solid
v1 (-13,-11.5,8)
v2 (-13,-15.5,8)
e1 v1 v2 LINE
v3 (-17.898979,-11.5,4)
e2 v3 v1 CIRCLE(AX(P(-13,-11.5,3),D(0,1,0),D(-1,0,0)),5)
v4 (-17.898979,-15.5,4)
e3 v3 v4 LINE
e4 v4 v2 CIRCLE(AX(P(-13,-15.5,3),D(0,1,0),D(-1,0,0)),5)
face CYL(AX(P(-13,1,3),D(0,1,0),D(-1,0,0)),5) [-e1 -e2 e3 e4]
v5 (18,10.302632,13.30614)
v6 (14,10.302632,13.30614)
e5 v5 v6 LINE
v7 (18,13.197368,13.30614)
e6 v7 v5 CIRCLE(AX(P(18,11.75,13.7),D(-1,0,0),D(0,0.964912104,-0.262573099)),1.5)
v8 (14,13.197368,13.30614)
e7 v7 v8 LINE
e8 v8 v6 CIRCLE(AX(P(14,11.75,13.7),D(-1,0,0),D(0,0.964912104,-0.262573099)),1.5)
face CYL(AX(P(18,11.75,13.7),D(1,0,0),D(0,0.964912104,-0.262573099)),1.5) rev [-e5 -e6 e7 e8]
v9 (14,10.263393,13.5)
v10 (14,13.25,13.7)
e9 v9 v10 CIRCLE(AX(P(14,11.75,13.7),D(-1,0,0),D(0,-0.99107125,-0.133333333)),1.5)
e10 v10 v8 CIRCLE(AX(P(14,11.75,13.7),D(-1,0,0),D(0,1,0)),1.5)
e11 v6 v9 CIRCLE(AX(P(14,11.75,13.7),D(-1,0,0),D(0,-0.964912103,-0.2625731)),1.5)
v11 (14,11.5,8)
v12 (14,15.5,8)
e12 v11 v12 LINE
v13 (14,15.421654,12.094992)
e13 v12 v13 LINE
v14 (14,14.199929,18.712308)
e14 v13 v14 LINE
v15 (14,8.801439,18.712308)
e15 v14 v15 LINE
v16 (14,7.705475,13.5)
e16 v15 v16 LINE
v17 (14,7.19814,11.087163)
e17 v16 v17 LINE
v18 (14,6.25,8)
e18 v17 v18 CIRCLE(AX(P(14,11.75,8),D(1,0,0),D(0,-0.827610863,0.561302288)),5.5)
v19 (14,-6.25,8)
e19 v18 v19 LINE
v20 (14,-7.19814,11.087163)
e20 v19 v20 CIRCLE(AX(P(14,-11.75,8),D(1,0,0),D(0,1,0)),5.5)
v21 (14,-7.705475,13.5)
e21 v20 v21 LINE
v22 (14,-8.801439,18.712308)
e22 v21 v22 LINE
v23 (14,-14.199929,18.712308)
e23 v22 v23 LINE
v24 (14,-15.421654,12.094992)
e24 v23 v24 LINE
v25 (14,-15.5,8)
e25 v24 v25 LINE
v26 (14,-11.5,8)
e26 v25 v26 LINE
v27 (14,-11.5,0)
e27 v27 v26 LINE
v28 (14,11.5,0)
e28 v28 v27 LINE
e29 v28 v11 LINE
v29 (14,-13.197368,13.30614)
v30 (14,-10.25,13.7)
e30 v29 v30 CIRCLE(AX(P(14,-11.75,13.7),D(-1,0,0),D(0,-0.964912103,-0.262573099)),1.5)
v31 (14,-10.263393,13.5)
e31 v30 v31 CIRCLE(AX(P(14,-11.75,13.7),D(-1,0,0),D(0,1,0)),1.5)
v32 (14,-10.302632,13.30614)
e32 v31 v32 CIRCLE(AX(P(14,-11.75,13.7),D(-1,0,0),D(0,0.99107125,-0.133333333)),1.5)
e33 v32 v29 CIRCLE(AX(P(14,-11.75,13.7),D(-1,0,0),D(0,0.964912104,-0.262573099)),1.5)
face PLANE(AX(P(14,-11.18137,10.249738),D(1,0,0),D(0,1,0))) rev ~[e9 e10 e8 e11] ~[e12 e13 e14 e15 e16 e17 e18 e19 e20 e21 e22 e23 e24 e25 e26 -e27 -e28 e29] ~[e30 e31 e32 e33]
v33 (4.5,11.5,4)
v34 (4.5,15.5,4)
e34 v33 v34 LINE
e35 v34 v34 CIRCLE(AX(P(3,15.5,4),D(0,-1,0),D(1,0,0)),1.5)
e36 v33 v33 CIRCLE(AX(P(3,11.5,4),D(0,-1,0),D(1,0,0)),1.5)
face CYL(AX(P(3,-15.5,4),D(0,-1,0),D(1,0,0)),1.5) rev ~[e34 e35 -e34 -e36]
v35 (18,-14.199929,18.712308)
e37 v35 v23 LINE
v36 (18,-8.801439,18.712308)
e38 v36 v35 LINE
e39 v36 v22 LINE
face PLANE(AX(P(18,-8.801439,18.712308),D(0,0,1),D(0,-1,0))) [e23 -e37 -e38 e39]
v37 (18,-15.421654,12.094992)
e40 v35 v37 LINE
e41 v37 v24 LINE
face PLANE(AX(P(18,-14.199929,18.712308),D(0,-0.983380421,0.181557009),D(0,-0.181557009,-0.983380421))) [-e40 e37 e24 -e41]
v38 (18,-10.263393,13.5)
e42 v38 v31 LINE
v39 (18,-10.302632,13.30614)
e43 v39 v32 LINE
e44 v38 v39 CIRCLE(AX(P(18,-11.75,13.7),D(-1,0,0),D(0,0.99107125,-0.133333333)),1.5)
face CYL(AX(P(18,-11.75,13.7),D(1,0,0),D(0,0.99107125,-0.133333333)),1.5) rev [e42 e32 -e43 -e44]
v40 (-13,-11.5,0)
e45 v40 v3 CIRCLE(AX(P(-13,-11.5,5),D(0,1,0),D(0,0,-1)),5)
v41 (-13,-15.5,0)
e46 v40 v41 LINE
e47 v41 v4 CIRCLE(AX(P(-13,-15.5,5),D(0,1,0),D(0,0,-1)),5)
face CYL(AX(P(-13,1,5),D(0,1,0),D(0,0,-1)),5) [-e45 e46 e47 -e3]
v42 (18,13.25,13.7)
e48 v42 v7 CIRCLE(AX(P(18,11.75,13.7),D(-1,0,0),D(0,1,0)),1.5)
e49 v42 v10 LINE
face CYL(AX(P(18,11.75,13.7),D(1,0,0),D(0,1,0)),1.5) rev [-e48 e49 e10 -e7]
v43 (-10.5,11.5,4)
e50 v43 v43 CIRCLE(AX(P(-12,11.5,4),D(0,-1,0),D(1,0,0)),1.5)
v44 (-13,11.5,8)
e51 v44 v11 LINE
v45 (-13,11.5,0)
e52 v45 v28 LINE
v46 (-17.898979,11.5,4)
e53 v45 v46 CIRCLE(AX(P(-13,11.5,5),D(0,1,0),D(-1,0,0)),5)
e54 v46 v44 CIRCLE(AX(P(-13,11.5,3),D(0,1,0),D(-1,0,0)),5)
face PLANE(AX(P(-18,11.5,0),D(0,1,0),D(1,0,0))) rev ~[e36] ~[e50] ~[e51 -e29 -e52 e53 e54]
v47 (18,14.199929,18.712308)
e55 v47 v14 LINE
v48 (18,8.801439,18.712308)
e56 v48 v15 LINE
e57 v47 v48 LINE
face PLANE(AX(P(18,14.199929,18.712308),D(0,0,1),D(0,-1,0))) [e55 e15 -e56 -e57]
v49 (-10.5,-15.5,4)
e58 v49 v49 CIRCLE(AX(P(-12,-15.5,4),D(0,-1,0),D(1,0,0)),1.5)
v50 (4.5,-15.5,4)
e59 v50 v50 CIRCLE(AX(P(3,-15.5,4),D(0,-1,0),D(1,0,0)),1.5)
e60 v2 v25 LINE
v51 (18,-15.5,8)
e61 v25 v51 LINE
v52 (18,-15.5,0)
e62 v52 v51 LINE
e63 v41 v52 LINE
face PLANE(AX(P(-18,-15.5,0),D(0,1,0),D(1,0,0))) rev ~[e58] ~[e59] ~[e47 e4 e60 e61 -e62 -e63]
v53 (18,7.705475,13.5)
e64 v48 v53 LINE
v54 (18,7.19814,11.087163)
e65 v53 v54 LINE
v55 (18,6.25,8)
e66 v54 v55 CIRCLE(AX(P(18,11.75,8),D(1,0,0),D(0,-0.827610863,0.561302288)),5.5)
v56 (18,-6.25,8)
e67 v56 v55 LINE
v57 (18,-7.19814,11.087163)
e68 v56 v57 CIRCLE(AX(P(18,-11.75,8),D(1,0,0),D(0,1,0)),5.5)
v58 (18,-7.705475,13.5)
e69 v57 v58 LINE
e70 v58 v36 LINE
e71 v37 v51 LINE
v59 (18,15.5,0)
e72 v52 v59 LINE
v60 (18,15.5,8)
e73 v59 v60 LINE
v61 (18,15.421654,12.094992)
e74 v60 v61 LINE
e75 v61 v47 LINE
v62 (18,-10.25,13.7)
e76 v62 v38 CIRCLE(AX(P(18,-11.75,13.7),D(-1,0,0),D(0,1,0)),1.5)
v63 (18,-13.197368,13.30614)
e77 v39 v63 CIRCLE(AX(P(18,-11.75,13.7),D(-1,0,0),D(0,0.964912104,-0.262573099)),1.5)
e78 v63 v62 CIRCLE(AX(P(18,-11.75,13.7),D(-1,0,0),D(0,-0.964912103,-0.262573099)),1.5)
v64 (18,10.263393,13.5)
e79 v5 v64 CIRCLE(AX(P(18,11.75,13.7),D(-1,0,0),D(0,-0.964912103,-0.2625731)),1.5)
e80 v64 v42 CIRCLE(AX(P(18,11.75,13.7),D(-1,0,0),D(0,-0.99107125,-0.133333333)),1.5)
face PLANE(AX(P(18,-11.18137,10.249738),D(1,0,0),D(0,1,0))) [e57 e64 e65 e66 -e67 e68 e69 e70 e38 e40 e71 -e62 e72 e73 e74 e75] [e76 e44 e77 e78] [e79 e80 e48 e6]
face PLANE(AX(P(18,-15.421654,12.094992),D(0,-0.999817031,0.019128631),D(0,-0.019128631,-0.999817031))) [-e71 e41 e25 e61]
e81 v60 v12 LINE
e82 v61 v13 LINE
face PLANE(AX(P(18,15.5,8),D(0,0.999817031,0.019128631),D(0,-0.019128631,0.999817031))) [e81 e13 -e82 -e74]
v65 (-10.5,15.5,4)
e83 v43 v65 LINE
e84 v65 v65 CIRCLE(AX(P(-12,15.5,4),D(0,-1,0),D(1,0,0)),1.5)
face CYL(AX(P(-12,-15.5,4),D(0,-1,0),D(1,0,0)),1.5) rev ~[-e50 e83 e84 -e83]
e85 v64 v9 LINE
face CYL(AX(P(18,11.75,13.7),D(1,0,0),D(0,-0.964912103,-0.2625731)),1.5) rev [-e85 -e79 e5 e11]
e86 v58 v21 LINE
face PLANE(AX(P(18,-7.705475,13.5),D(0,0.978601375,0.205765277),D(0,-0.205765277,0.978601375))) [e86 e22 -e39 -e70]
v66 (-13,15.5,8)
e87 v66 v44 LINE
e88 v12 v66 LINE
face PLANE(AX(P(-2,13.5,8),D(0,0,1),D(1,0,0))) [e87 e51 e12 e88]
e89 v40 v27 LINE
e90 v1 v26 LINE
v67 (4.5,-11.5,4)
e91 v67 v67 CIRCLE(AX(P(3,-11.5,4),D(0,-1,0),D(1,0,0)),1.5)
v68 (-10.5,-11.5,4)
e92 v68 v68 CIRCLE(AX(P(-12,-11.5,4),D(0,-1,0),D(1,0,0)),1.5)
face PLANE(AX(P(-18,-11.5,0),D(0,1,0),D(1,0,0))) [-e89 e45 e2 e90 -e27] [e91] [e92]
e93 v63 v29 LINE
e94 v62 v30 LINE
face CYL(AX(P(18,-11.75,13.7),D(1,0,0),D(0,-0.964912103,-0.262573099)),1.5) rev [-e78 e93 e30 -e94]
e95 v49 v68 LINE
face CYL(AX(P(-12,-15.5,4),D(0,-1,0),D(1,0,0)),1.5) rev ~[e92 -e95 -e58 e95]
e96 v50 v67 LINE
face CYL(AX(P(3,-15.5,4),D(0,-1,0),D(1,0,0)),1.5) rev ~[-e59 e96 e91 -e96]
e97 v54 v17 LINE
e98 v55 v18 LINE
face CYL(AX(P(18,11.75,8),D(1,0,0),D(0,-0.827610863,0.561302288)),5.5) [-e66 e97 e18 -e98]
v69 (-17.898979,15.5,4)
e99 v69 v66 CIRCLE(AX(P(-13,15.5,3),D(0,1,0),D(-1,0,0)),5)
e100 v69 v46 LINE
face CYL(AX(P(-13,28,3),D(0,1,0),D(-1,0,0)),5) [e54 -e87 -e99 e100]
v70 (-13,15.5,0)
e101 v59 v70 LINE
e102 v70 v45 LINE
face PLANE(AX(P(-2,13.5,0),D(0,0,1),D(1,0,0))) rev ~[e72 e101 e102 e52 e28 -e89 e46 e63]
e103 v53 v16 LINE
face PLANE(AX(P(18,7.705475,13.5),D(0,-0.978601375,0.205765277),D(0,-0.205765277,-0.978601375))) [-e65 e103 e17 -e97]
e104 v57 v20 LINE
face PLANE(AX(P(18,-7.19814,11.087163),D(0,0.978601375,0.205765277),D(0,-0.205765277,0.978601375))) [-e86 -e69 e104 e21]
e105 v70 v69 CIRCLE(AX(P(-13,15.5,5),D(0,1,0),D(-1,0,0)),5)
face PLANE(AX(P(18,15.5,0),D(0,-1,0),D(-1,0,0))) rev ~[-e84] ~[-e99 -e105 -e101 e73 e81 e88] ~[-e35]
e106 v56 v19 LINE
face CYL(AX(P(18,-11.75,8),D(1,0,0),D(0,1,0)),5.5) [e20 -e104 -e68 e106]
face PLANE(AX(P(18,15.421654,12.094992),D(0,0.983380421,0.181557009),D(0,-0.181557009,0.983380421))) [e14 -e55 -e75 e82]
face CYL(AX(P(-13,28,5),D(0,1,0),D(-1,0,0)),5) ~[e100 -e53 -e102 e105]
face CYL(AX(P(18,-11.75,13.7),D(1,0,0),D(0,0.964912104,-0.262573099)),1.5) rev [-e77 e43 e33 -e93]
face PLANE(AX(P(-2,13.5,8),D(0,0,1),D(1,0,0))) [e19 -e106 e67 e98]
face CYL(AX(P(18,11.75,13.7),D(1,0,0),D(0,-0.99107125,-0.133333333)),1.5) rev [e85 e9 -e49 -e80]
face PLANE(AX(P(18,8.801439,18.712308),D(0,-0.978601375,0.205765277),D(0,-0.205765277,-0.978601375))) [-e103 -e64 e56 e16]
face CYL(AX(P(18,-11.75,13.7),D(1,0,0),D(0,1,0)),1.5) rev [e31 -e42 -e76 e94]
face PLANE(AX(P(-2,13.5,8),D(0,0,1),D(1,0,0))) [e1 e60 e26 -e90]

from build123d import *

# Parameters (mm, degrees)
F0_W        = 32
F0_H        = 4
F1_DEPTH    = 8
F3_DEPTH    = 4
F4_DEPTH    = 25
F5_R        = 1.5
F6_DEPTH    = 40
F7_T1_DEPTH = 29
F7_T3_DEPTH = 29


# Not quite as in the source:
# - a fillet or chamfer that OpenCascade refuses, or shapes differently, is made with other operations: its cross-section is extruded or revolved along the edge and cut away or added


with BuildPart() as f1:
    # F0 (on Top) → F1 (new body)
    with BuildSketch(Plane.XY):
        with Locations((-2, 13.5)):
            Rectangle(F0_W, F0_H)
        Polygon((14, 11.5), (14, -11.5), (14, -15.5), (18, -15.5), (18, 0), (18, 15.5), (14, 15.5), align=None)
        with Locations((-2, -13.5)):
            Rectangle(F0_W, F0_H)
    extrude(amount=F1_DEPTH)

    # F2 (on face) → F3 (join, through all)
    with BuildSketch(Plane.YZ.offset(18)):
        with BuildLine():
            Line((-15.4216540828, 12.0949916113), (-15.5, 8))
            Line((-15.5, 8), (-6.25, 8))
            ThreePointArc((-6.25, 8), (-6.4923756022, 9.6147401314), (-7.1981402517, 11.0871625858))
            ThreePointArc((-7.1981402517, 11.0871625858), (-8.5517740167, 12.4745223834), (-10.3026318448, 13.3061403509))
            ThreePointArc((-10.3026318448, 13.3061403509), (-11.75, 12.2), (-13.1973681552, 13.3061403509))
            ThreePointArc((-13.1973681552, 13.3061403509), (-14.3801744212, 12.8303397928), (-15.4216540828, 12.0949916113))
        make_face()
        with BuildLine():
            Line((6.25, 8), (11.75, 8))
            Line((11.75, 8), (15.5, 8))
            Line((15.5, 8), (15.4216540828, 12.0949916113))
            ThreePointArc((15.4216540828, 12.0949916113), (14.3801744212, 12.8303397928), (13.1973681552, 13.3061403509))
            ThreePointArc((13.1973681552, 13.3061403509), (11.75, 12.2), (10.3026318448, 13.3061403509))
            ThreePointArc((10.3026318448, 13.3061403509), (8.5517740167, 12.4745223834), (7.1981402517, 11.0871625858))
            ThreePointArc((7.1981402517, 11.0871625858), (6.4923756022, 9.6147401314), (6.25, 8))
        make_face()
        with BuildLine():
            Line((-14.1999293119, 18.7123082578), (-15.4216540828, 12.0949916113))
            ThreePointArc((-15.4216540828, 12.0949916113), (-14.3801744212, 12.8303397928), (-13.1973681552, 13.3061403509))
            ThreePointArc((-13.1973681552, 13.3061403509), (-11.9486803553, 15.1867838163), (-10.25, 13.7))
            ThreePointArc((-10.25, 13.7), (-10.2533520267, 13.5997760311), (-10.2633931253, 13.5))
            Line((-10.2633931253, 13.5), (-7.7054746686, 13.5))
            Line((-7.7054746686, 13.5), (-8.8014388457, 18.7123082578))
            Line((-8.8014388457, 18.7123082578), (-14.1999293119, 18.7123082578))
        make_face()
        with BuildLine():
            ThreePointArc((-10.3026318448, 13.3061403509), (-8.5517740167, 12.4745223834), (-7.1981402517, 11.0871625858))
            Line((-7.1981402517, 11.0871625858), (-7.7054746686, 13.5))
            Line((-7.7054746686, 13.5), (-10.2633931253, 13.5))
            ThreePointArc((-10.2633931253, 13.5), (-10.2798136989, 13.4024227159), (-10.3026318448, 13.3061403509))
        make_face()
        with BuildLine():
            ThreePointArc((13.1973681552, 13.3061403509), (14.3801744212, 12.8303397928), (15.4216540828, 12.0949916113))
            Line((15.4216540828, 12.0949916113), (14.1999293119, 18.7123082578))
            Line((14.1999293119, 18.7123082578), (8.8014388457, 18.7123082578))
            Line((8.8014388457, 18.7123082578), (7.7054746686, 13.5))
            Line((7.7054746686, 13.5), (10.2633931253, 13.5))
            ThreePointArc((10.2633931253, 13.5), (11.6497760311, 15.1966479733), (13.25, 13.7))
            ThreePointArc((13.25, 13.7), (13.2367838163, 13.5013196447), (13.1973681552, 13.3061403509))
        make_face()
        with BuildLine():
            Line((7.7054746686, 13.5), (7.1981402517, 11.0871625858))
            ThreePointArc((7.1981402517, 11.0871625858), (8.5517740167, 12.4745223834), (10.3026318448, 13.3061403509))
            ThreePointArc((10.3026318448, 13.3061403509), (10.2798136989, 13.4024227159), (10.2633931253, 13.5))
            Line((10.2633931253, 13.5), (7.7054746686, 13.5))
        make_face()
    extrude(amount=-F3_DEPTH)

    # F2 (on face) → F4 (cut)
    with BuildSketch(Plane.YZ.offset(18)):
        with BuildLine():
            ThreePointArc((10.2633931253, 13.5), (10.2798136989, 13.4024227159), (10.3026318448, 13.3061403509))
            ThreePointArc((10.3026318448, 13.3061403509), (11.0198534153, 13.4513196535), (11.75, 13.5))
            Line((11.75, 13.5), (10.2633931253, 13.5))
        make_face()
        with BuildLine():
            ThreePointArc((11.75, 13.5), (11.0198534153, 13.4513196535), (10.3026318448, 13.3061403509))
            ThreePointArc((10.3026318448, 13.3061403509), (11.75, 12.2), (13.1973681552, 13.3061403509))
            ThreePointArc((13.1973681552, 13.3061403509), (12.4801465847, 13.4513196535), (11.75, 13.5))
        make_face()
        with BuildLine():
            ThreePointArc((11.75, 13.5), (12.4801465847, 13.4513196535), (13.1973681552, 13.3061403509))
            ThreePointArc((13.1973681552, 13.3061403509), (13.2367838163, 13.5013196447), (13.25, 13.7))
            ThreePointArc((13.25, 13.7), (11.6497760311, 15.1966479733), (10.2633931253, 13.5))
            Line((10.2633931253, 13.5), (11.75, 13.5))
        make_face()
        with BuildLine():
            ThreePointArc((-11.75, 13.5), (-12.4801465847, 13.4513196535), (-13.1973681552, 13.3061403509))
            ThreePointArc((-13.1973681552, 13.3061403509), (-11.75, 12.2), (-10.3026318448, 13.3061403509))
            ThreePointArc((-10.3026318448, 13.3061403509), (-11.0198534153, 13.4513196535), (-11.75, 13.5))
        make_face()
        with BuildLine():
            ThreePointArc((-11.75, 13.5), (-11.0198534153, 13.4513196535), (-10.3026318448, 13.3061403509))
            ThreePointArc((-10.3026318448, 13.3061403509), (-10.2798136989, 13.4024227159), (-10.2633931253, 13.5))
            Line((-10.2633931253, 13.5), (-11.75, 13.5))
        make_face()
        with BuildLine():
            ThreePointArc((-10.25, 13.7), (-11.9486803553, 15.1867838163), (-13.1973681552, 13.3061403509))
            ThreePointArc((-13.1973681552, 13.3061403509), (-12.4801465847, 13.4513196535), (-11.75, 13.5))
            Line((-11.75, 13.5), (-10.2633931253, 13.5))
            ThreePointArc((-10.2633931253, 13.5), (-10.2533520267, 13.5997760311), (-10.25, 13.7))
        make_face()
    extrude(amount=-F4_DEPTH, mode=Mode.SUBTRACT)

    # F5 (on face) → F6 (cut)
    with BuildSketch(Plane.XZ.offset(15.5)):
        with Locations((-12, 4)):
            Circle(F5_R)
        with Locations((3, 4)):
            Circle(F5_R)
    extrude(amount=-F6_DEPTH, mode=Mode.SUBTRACT)

    # F7: fillet of radius 5 on 4 edges, made by hand

    # F7_s2 → F7_t1 (cut)
    with BuildSketch(Plane.XZ.offset(-1)):
        with BuildLine():
            ThreePointArc((-18, 3), (-16.5355339059, 6.5355339059), (-13, 8))
            Line((-13, 8), (-18, 8))
            Line((-18, 8), (-18, 3))
        make_face()
        with BuildLine():
            ThreePointArc((-13, 0), (-16.5355339059, 1.4644660941), (-18, 5))
            Line((-18, 5), (-18, 0))
            Line((-18, 0), (-13, 0))
        make_face()
    extrude(amount=F7_T1_DEPTH, mode=Mode.SUBTRACT)

    # F7_s4 → F7_t3 (cut)
    with BuildSketch(Plane.XZ.offset(-28)):
        with BuildLine():
            ThreePointArc((-18, 3), (-16.5355339059, 6.5355339059), (-13, 8))
            Line((-13, 8), (-18, 8))
            Line((-18, 8), (-18, 3))
        make_face()
        with BuildLine():
            ThreePointArc((-18, 5), (-16.5355339059, 1.4644660941), (-13, 0))
            Line((-13, 0), (-18, 0))
            Line((-18, 0), (-18, 5))
        make_face()
    extrude(amount=F7_T3_DEPTH, mode=Mode.SUBTRACT)


solid = f1.part
